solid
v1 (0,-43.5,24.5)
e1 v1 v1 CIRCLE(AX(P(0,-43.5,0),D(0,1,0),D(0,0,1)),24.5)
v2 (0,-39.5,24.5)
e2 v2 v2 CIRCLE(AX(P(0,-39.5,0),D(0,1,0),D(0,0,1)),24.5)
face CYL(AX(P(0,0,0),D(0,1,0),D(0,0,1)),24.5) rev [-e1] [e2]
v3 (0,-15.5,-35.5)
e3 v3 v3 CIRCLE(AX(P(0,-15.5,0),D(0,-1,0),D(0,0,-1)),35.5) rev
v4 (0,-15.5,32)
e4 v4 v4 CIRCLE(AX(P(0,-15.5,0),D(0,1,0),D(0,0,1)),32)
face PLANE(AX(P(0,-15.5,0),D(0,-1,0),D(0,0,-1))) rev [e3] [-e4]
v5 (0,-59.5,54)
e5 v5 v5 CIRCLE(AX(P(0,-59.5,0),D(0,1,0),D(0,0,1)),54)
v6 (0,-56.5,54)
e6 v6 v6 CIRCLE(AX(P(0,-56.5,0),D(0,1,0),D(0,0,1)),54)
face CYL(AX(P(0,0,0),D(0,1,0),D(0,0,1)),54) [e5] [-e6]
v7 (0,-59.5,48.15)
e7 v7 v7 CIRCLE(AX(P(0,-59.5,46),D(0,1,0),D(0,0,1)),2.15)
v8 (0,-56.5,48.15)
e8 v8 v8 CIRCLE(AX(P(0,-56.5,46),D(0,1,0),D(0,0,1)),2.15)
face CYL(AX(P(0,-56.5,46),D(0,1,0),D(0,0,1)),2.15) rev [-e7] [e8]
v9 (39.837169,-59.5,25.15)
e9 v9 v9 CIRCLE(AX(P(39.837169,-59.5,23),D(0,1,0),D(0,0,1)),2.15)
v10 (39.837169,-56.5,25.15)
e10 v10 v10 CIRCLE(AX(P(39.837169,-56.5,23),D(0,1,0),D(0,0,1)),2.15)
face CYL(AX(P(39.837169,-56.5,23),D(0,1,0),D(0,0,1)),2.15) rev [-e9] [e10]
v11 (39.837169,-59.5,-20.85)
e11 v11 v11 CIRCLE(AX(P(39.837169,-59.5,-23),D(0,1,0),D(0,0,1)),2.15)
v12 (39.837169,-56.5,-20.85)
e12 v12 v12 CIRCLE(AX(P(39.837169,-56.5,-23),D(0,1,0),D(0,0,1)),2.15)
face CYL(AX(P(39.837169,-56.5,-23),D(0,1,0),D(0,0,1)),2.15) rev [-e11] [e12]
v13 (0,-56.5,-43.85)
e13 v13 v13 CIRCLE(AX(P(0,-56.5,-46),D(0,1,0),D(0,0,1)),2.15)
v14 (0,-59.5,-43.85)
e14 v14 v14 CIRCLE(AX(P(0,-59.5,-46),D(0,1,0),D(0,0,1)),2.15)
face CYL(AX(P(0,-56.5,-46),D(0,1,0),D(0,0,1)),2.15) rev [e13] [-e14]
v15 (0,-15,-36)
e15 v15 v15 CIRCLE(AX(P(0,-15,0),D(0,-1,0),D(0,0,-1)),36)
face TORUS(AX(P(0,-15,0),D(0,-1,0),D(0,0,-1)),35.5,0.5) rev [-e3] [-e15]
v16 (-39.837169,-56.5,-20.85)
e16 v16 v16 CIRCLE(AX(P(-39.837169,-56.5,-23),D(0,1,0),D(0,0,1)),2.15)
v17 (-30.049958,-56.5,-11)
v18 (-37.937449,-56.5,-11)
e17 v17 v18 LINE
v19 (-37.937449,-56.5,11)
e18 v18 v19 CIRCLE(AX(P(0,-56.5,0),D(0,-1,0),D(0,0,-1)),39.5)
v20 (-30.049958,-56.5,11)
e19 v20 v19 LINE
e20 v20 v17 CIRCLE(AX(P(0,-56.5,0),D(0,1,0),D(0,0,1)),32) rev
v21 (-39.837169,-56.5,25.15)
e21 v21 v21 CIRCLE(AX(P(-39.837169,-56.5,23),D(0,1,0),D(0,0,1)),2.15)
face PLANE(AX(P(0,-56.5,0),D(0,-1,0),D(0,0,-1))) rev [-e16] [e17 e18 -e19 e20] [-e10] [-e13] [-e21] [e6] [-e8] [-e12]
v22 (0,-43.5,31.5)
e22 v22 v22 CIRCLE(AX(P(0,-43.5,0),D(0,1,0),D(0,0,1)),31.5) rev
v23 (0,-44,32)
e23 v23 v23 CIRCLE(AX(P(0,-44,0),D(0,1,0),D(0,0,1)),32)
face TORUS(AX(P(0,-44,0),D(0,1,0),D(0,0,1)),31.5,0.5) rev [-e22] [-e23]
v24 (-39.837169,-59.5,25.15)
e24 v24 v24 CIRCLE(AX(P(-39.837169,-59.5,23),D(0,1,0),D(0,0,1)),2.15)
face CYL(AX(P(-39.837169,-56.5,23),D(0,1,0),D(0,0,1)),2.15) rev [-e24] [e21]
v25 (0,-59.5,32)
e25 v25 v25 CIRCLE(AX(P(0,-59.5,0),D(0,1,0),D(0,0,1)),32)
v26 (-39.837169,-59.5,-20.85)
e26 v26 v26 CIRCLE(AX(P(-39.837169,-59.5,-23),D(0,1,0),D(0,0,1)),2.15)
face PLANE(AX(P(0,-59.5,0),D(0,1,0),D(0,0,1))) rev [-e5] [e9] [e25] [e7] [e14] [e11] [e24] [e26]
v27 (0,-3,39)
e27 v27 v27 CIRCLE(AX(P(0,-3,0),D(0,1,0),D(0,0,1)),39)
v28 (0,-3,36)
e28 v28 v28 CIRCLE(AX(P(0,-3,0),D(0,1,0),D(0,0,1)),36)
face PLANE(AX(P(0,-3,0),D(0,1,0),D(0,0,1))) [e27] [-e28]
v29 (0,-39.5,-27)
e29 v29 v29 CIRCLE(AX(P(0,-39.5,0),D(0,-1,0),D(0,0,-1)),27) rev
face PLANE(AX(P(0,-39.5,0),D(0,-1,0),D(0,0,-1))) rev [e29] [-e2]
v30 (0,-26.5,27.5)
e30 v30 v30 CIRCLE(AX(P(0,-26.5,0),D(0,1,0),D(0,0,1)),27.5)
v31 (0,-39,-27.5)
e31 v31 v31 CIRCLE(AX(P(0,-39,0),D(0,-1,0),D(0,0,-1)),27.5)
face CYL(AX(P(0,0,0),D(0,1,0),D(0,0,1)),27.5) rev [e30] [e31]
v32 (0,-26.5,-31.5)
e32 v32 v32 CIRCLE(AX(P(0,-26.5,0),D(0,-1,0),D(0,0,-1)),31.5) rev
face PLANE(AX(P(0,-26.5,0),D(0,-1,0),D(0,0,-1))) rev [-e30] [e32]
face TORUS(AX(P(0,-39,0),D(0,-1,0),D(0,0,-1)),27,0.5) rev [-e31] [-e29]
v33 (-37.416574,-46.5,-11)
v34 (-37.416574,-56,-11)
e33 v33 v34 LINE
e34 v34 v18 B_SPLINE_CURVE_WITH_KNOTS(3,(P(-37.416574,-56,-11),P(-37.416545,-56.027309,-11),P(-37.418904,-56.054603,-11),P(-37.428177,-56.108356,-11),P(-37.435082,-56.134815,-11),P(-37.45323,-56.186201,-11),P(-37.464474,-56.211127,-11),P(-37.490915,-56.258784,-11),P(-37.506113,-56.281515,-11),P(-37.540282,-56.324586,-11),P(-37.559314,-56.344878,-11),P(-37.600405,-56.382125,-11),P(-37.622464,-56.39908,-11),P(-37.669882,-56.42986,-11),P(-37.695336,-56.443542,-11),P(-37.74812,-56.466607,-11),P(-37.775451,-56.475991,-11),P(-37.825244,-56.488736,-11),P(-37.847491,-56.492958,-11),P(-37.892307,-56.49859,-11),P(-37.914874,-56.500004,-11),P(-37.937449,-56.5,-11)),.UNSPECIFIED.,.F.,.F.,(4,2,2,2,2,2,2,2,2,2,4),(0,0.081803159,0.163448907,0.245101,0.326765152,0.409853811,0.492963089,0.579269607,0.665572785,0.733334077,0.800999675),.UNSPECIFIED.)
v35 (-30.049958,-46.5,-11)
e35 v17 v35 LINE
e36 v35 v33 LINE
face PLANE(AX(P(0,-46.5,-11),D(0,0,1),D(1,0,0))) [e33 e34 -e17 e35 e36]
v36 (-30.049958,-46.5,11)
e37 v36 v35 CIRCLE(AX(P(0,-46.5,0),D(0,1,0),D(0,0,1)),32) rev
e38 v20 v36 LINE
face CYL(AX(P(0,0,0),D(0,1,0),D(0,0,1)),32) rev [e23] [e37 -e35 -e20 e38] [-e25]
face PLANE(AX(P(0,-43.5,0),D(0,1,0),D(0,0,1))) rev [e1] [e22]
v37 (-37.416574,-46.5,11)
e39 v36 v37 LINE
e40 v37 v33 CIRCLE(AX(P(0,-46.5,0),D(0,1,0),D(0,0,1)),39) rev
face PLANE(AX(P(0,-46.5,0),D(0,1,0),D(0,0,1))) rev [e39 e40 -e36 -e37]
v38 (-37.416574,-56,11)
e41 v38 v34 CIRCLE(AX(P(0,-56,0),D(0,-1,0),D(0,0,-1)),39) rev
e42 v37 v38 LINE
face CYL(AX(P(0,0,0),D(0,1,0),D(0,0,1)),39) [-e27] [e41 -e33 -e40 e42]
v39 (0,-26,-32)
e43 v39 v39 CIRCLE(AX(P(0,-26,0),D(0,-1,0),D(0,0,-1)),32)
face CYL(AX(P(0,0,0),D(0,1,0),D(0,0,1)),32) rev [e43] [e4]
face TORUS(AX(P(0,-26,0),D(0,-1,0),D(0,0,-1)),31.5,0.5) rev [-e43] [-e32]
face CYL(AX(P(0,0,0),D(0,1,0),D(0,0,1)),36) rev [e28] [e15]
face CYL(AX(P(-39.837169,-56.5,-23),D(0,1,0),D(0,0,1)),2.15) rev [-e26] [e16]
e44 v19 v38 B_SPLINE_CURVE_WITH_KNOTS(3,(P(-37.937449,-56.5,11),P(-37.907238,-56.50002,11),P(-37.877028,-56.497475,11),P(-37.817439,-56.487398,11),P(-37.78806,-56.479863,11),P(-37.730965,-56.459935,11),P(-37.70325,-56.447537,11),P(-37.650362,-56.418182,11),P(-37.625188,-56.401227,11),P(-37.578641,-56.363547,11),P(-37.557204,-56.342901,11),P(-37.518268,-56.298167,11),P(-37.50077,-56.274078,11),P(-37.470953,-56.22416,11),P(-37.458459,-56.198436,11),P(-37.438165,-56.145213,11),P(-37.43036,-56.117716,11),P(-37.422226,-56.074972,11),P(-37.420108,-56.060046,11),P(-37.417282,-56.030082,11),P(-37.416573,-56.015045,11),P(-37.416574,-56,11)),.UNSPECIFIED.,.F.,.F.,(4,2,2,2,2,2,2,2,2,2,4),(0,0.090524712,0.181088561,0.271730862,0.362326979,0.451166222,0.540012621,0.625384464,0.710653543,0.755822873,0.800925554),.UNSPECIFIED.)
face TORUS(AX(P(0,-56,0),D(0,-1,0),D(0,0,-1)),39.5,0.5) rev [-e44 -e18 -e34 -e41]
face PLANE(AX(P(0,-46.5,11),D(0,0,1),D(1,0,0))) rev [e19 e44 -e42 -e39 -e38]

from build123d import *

# Parameters (mm, degrees)
M4_CLEARANCE_HOLE1_D     = 4.3
M4_CLEARANCE_HOLE1_DEPTH = 100
M4_CLEARANCE_HOLE1_TIP   = 1.291850331
CUT_EXTRUDE1_DEPTH       = 10
FILLET1_R                = 0.5


with BuildPart() as part:
    # Sketch1 → Revolve1 (revolve)
    with BuildSketch(Plane.XY):
        Polygon((-37, -3), (-39, -3), (-39, -56.5), (-54, -56.5), (-54, -59.5), (-32, -59.5), (-32, -43.5), (-24.5, -43.5), (-24.5, -39.5), (-27.5, -39.5), (-27.5, -26.5), (-32, -26.5), (-32, -15.5), (-36, -15.5), (-36, -3), align=None)
    revolve(axis=Axis((0, 0, 0), (0, -1, 0)))

    # M4 Clearance Hole1
    with Locations(Plane(origin=(0, -56.5, 0), x_dir=(1, 0, 0), z_dir=(0, 1, 0))):
        with Locations((0, 46), (39.837168574, 23), (39.837168574, -23), (0, -46), (-39.837168574, -23), (-39.837168574, 23)):
            Hole(M4_CLEARANCE_HOLE1_D / 2, depth=M4_CLEARANCE_HOLE1_DEPTH)
            with Locations((0, 0, -(M4_CLEARANCE_HOLE1_DEPTH + M4_CLEARANCE_HOLE1_TIP / 2))):  # 118° drill point
                Cone(0, M4_CLEARANCE_HOLE1_D / 2, M4_CLEARANCE_HOLE1_TIP, mode=Mode.SUBTRACT)

    # Sketch6 → Cut-Extrude1 (cut)
    with BuildSketch(Plane.XZ.offset(56.5)):
        with BuildLine():
            ThreePointArc((-15.184284639, -11), (-18.75, 0), (-15.184284639, 11))
            Line((-15.184284639, 11), (-28.447319733, 11))
            Line((-28.447319733, 11), (-37.416573868, 11))
            ThreePointArc((-37.416573868, 11), (-39, 0), (-37.416573868, -11))
            Line((-37.416573868, -11), (-28.447319733, -11))
            Line((-28.447319733, -11), (-15.184284639, -11))
        make_face()
    extrude(amount=-CUT_EXTRUDE1_DEPTH, mode=Mode.SUBTRACT)

    # Fillet1
    fillet1_edges = [part.edges().sort_by_distance(p)[0] for p in [
        (32, -43.5, 0),
        (32, -26.5, 0),
        (39, -56.5, 0),
        (27.5, -39.5, 0),
        (36, -15.5, 0),
    ]]
    fillet(fillet1_edges, radius=FILLET1_R)


solid = part.part
